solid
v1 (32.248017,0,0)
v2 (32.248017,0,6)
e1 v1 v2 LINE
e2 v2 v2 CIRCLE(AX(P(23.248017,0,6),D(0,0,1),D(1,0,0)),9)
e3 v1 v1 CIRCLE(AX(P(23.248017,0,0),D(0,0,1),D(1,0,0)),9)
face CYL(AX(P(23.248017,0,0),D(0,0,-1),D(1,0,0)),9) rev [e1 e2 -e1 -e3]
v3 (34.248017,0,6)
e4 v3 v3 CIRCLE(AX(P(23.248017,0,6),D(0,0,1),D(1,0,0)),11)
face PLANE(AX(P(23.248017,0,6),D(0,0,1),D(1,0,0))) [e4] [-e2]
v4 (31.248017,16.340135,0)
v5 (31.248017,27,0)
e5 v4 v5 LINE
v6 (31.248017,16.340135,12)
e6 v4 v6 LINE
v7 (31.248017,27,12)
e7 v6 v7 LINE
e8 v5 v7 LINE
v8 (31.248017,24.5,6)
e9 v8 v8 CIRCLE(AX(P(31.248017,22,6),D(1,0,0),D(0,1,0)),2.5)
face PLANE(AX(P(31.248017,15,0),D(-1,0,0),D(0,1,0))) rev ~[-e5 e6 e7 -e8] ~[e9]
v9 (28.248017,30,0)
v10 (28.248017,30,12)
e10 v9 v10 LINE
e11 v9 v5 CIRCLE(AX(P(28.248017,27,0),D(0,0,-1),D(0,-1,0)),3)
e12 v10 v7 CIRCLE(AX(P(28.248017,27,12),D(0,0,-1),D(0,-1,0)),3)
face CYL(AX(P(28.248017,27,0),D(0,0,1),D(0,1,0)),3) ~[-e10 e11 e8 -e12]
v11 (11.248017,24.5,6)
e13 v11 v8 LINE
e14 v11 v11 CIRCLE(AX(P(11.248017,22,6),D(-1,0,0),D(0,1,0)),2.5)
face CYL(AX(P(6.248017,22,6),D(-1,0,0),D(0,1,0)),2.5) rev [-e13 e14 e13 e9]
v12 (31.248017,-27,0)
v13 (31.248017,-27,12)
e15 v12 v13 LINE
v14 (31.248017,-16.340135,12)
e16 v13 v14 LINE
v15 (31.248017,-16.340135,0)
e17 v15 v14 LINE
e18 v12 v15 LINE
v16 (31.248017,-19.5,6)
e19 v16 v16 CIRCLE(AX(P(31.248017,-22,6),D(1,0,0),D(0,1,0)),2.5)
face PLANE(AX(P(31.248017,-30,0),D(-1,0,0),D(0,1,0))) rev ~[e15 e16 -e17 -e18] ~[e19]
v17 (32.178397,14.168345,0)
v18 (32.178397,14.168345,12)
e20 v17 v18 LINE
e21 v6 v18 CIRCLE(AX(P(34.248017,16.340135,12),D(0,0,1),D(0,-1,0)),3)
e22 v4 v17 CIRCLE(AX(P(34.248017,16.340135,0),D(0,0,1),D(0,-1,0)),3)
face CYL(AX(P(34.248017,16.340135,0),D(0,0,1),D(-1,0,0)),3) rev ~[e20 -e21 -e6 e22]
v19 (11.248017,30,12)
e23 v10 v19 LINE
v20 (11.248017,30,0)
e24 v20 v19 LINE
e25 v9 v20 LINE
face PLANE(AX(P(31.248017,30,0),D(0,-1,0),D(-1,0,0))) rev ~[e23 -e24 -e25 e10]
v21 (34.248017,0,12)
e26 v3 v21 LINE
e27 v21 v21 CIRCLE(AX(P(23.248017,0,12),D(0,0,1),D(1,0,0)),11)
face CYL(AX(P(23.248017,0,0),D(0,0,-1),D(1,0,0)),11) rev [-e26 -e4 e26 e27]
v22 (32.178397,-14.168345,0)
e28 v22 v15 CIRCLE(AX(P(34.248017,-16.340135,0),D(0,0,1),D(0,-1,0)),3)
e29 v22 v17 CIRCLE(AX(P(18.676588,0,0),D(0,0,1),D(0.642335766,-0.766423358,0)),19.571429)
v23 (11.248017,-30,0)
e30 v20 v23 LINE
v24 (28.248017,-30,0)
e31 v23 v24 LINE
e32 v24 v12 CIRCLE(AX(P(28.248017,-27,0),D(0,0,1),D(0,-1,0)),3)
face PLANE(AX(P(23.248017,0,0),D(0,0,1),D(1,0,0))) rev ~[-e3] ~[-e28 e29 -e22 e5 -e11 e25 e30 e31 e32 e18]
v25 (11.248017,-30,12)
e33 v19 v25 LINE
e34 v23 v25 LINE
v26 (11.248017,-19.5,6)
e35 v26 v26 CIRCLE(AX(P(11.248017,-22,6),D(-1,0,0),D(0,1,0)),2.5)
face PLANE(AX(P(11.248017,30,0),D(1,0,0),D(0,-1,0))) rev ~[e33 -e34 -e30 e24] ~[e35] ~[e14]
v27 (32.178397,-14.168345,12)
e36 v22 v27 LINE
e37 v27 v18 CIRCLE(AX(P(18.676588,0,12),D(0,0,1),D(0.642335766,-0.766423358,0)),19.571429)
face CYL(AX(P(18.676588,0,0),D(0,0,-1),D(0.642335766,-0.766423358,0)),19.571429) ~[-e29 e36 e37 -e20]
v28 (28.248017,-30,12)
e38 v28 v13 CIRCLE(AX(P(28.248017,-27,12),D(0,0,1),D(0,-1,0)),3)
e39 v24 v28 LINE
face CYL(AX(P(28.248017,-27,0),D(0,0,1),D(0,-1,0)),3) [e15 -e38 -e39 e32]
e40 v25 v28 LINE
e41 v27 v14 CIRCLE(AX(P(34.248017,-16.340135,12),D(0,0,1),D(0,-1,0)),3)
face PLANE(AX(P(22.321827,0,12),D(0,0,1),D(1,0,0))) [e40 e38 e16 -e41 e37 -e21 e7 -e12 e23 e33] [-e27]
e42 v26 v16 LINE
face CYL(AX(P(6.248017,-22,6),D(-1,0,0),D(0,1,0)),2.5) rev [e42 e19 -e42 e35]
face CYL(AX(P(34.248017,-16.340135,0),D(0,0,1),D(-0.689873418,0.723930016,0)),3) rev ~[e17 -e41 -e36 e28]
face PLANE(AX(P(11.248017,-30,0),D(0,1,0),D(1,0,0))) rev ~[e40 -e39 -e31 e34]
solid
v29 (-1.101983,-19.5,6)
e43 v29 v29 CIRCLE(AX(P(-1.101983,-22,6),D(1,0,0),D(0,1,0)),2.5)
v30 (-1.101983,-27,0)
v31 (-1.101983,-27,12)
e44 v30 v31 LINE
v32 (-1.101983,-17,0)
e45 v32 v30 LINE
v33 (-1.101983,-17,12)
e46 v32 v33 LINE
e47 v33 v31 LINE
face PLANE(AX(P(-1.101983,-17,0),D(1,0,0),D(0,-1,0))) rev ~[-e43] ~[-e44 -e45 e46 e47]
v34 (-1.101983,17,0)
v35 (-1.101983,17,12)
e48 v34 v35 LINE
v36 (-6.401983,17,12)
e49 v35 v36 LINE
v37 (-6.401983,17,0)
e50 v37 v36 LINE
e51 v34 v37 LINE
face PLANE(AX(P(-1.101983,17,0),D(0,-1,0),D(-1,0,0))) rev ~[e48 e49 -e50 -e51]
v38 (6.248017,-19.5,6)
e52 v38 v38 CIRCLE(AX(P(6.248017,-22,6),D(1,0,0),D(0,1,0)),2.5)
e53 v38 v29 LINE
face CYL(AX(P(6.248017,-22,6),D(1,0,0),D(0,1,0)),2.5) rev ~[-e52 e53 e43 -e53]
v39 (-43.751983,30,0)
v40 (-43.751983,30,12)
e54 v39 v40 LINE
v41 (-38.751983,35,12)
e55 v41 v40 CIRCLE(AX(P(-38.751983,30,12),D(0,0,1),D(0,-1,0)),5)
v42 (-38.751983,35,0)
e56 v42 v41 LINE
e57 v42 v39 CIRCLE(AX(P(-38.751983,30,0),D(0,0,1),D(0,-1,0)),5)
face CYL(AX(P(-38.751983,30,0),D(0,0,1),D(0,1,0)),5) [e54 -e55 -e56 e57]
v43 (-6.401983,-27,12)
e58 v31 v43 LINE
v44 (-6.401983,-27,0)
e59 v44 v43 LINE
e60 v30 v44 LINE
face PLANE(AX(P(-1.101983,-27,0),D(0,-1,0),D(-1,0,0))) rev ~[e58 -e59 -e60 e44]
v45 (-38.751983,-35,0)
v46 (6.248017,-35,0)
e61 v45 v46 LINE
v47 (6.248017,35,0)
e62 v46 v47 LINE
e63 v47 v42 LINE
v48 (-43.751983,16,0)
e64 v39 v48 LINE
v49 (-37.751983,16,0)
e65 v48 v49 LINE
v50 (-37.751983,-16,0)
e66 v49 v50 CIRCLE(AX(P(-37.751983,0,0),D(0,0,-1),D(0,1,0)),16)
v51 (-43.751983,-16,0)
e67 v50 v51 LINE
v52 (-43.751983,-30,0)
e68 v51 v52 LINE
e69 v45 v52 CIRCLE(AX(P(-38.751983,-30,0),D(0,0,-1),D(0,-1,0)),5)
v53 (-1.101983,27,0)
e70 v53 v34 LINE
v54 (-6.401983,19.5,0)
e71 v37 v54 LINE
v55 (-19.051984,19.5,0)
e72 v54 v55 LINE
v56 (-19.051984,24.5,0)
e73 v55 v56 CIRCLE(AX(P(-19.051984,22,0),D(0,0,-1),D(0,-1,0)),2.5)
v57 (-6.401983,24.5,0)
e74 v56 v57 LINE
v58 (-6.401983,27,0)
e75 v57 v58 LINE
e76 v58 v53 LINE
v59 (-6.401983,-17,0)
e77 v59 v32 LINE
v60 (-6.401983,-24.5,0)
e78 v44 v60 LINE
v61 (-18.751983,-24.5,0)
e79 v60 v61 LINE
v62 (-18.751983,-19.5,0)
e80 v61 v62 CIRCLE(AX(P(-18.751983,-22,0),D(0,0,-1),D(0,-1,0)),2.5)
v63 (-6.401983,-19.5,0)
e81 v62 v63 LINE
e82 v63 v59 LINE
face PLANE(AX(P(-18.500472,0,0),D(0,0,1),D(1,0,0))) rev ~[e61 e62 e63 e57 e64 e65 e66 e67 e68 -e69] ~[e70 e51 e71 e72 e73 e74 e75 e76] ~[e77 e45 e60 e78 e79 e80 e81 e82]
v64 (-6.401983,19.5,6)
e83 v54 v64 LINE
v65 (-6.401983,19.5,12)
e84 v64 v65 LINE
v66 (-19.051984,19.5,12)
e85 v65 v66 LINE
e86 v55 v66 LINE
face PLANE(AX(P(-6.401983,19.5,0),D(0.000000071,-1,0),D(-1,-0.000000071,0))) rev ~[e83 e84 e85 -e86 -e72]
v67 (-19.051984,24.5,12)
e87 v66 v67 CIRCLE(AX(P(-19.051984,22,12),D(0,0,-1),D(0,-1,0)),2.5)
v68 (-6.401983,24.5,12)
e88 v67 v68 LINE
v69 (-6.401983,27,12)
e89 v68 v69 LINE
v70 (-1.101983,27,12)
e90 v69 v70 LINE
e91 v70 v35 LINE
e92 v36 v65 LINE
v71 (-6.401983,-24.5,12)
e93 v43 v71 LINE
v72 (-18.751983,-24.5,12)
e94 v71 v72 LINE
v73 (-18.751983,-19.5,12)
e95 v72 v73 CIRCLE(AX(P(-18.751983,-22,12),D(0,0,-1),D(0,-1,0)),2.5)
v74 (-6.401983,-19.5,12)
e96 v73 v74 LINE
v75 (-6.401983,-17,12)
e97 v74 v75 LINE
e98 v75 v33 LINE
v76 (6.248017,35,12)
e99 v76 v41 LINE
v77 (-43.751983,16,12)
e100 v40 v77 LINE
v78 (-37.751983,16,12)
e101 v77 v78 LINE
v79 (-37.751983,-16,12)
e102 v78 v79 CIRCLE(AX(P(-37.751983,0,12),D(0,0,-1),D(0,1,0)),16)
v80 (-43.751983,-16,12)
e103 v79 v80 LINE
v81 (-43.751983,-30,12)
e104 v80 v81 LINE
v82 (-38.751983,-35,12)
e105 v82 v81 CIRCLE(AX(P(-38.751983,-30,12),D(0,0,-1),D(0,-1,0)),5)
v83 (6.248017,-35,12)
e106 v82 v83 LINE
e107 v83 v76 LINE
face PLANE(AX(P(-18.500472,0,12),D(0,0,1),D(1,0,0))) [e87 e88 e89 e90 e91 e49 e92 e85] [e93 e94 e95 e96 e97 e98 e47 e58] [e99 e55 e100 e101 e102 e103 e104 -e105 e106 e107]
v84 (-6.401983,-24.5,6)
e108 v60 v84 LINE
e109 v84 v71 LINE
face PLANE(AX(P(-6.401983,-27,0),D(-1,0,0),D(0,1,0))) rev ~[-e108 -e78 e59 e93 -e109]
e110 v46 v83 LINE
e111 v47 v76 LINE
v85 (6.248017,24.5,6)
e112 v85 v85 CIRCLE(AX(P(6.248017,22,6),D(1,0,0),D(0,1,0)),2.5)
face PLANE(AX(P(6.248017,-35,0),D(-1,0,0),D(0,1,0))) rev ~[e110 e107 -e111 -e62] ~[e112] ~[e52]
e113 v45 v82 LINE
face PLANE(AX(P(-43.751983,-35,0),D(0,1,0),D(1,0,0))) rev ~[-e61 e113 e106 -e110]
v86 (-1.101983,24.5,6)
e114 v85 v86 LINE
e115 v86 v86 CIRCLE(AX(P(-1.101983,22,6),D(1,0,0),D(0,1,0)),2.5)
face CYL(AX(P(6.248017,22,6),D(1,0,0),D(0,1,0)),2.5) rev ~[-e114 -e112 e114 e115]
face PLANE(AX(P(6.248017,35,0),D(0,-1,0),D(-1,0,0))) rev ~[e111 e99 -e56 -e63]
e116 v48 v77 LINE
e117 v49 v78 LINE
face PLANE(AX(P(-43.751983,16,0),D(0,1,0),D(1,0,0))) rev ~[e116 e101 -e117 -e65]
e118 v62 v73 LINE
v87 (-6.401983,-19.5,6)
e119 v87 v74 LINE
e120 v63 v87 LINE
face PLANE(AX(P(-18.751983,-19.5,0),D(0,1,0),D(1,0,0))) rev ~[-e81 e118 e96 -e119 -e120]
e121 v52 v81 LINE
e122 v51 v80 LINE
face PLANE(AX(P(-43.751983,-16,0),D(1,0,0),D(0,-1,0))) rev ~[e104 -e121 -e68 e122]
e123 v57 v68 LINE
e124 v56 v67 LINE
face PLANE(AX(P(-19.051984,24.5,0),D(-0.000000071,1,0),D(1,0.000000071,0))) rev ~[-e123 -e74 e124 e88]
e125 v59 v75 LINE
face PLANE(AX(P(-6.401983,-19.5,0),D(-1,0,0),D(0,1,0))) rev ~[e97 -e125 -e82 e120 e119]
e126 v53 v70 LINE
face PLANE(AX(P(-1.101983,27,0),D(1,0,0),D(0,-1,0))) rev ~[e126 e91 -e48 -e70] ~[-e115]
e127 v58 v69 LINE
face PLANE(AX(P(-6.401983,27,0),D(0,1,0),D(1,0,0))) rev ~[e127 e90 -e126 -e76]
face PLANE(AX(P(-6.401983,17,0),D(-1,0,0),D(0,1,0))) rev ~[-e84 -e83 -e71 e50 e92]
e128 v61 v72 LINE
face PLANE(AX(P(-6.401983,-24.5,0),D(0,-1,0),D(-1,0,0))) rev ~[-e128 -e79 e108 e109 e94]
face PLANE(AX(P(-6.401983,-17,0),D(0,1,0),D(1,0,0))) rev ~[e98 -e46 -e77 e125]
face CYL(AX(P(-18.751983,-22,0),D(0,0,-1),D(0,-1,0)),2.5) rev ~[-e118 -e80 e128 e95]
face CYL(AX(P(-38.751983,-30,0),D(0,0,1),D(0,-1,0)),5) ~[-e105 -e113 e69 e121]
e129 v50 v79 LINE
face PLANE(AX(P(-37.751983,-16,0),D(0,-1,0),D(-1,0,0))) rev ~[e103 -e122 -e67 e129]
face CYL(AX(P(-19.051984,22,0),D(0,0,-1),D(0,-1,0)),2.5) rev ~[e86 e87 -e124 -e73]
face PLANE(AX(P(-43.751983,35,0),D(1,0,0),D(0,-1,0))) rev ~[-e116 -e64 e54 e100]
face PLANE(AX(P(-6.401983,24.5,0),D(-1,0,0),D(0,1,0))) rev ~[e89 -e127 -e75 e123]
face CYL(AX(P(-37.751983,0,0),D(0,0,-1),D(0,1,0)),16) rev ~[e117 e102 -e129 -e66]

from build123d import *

# Parameters (mm, degrees)
F1_DEPTH  = 12
F2_R      = 2.5
F3_DEPTH  = 15
F4_R      = 5
F5_R      = 11
F6_DEPTH  = 12
F5_R_2    = 9
F7_DEPTH  = 6
F8_R      = 3
F6_FACE_W = 10.6598653616
F6_FACE_H = 12
F9_DEPTH  = 25


# Not quite as in the source:
# - a feature names something its author has since deleted; it is built from what else it names


with BuildPart() as f1:
    # F0 (on Top) → F1 (new body)
    with BuildSketch(Plane.XY):
        with BuildLine():
            Line((6.2480168641, -35), (6.2480168641, 0))
            Line((6.2480168641, 0), (6.2480168641, 35))
            Line((6.2480168641, 35), (-43.7519831359, 35))
            Line((-43.7519831359, 35), (-43.7519831359, 16))
            Line((-43.7519831359, 16), (-37.7519831359, 16))
            ThreePointArc((-37.7519831359, 16), (-21.7519831359, 0), (-37.7519831359, -16))
            Line((-37.7519831359, -16), (-43.7519831359, -16))
            Line((-43.7519831359, -16), (-43.7519831359, -35))
            Line((-43.7519831359, -35), (6.2480168641, -35))
        make_face()
        with BuildLine():
            ThreePointArc((-18.7519831359, -24.5), (-21.2519831359, -22), (-18.7519831359, -19.5))
            Line((-18.7519831359, -19.5), (-6.4019831359, -19.5))
            Line((-6.4019831359, -19.5), (-6.4019831359, -17))
            Line((-6.4019831359, -17), (-1.1019831359, -17))
            Line((-1.1019831359, -17), (-1.1019831359, -27))
            Line((-1.1019831359, -27), (-6.4019831359, -27))
            Line((-6.4019831359, -27), (-6.4019831359, -24.5))
            Line((-6.4019831359, -24.5), (-18.7519831359, -24.5))
        make_face(mode=Mode.SUBTRACT)
        with BuildLine():
            ThreePointArc((-19.0519835278, 19.4999995902), (-21.5519835278, 21.9999995902), (-19.0519835278, 24.4999995902))
            Line((-19.0519835278, 24.4999995902), (-6.4019831359, 24.500000484))
            Line((-6.4019831359, 24.500000484), (-6.4019831359, 27))
            Line((-6.4019831359, 27), (-1.1019831359, 27))
            Line((-1.1019831359, 27), (-1.1019831359, 17))
            Line((-1.1019831359, 17), (-6.4019831359, 17))
            Line((-6.4019831359, 17), (-6.4019831359, 19.500000484))
            Line((-6.4019831359, 19.500000484), (-19.0519835278, 19.4999995902))
        make_face(mode=Mode.SUBTRACT)
    extrude(amount=F1_DEPTH)

    # F2 (on face) → F3 (cut)
    with BuildSketch(Plane.YZ.offset(6.2480168641)):
        with Locations((-22, 6)):
            Circle(F2_R)
        with Locations((22, 6)):
            Circle(F2_R)
    extrude(amount=-F3_DEPTH, mode=Mode.SUBTRACT)

    # F4
    f4_edges = [f1.edges().sort_by_distance(p)[0] for p in [
        (-43.751983, 35, 6),
        (-43.751983, -35, 6),
    ]]
    fillet(f4_edges, radius=F4_R)


with BuildPart() as f6:
    # F5 (on Top) → F6 (new body)
    with BuildSketch(Plane.XY):
        with BuildLine():
            Line((31.2480168641, 30), (11.2480168641, 30))
            Line((11.2480168641, 30), (11.2480168641, -30))
            Line((11.2480168641, -30), (31.2480168641, -30))
            Line((31.2480168641, -30), (31.2480168641, -15))
            ThreePointArc((31.2480168641, -15), (38.2480168641, 0), (31.2480168641, 15))
            Line((31.2480168641, 15), (31.2480168641, 30))
        make_face()
        with Locations((23.2480168641, 0)):
            Circle(F5_R, mode=Mode.SUBTRACT)
    extrude(amount=F6_DEPTH)

    # F5 (on Top) → F7 (join)
    with BuildSketch(Plane.XY):
        with Locations((23.2480168641, 0)):
            Circle(F5_R)
        with Locations((23.2480168641, 0)):
            Circle(F5_R_2, mode=Mode.SUBTRACT)
    extrude(amount=F7_DEPTH)

    # F8
    f8_edges = [f6.edges().sort_by_distance(p)[0] for p in [
        (31.248017, 30, 6),
        (31.248017, -30, 6),
        (31.248017, 15, 6),
        (31.248017, -15, 6),
    ]]
    fillet(f8_edges, radius=F8_R)

    # F2 (on face) + F6_face (on face) → F9 (cut)
    with BuildSketch(Plane.YZ.offset(6.2480168641)):
        with Locations((-22, 6)):
            Circle(F2_R)
        with Locations((22, 6)):
            Circle(F2_R)
    with BuildSketch(Plane(origin=(31.2480168641, 21.6700673192, 6), x_dir=(0, 1, 0), z_dir=(1, 0, 0))):
        Rectangle(F6_FACE_W, F6_FACE_H)
    extrude(amount=F9_DEPTH, mode=Mode.SUBTRACT)


solid = Compound([f1.part, f6.part])
